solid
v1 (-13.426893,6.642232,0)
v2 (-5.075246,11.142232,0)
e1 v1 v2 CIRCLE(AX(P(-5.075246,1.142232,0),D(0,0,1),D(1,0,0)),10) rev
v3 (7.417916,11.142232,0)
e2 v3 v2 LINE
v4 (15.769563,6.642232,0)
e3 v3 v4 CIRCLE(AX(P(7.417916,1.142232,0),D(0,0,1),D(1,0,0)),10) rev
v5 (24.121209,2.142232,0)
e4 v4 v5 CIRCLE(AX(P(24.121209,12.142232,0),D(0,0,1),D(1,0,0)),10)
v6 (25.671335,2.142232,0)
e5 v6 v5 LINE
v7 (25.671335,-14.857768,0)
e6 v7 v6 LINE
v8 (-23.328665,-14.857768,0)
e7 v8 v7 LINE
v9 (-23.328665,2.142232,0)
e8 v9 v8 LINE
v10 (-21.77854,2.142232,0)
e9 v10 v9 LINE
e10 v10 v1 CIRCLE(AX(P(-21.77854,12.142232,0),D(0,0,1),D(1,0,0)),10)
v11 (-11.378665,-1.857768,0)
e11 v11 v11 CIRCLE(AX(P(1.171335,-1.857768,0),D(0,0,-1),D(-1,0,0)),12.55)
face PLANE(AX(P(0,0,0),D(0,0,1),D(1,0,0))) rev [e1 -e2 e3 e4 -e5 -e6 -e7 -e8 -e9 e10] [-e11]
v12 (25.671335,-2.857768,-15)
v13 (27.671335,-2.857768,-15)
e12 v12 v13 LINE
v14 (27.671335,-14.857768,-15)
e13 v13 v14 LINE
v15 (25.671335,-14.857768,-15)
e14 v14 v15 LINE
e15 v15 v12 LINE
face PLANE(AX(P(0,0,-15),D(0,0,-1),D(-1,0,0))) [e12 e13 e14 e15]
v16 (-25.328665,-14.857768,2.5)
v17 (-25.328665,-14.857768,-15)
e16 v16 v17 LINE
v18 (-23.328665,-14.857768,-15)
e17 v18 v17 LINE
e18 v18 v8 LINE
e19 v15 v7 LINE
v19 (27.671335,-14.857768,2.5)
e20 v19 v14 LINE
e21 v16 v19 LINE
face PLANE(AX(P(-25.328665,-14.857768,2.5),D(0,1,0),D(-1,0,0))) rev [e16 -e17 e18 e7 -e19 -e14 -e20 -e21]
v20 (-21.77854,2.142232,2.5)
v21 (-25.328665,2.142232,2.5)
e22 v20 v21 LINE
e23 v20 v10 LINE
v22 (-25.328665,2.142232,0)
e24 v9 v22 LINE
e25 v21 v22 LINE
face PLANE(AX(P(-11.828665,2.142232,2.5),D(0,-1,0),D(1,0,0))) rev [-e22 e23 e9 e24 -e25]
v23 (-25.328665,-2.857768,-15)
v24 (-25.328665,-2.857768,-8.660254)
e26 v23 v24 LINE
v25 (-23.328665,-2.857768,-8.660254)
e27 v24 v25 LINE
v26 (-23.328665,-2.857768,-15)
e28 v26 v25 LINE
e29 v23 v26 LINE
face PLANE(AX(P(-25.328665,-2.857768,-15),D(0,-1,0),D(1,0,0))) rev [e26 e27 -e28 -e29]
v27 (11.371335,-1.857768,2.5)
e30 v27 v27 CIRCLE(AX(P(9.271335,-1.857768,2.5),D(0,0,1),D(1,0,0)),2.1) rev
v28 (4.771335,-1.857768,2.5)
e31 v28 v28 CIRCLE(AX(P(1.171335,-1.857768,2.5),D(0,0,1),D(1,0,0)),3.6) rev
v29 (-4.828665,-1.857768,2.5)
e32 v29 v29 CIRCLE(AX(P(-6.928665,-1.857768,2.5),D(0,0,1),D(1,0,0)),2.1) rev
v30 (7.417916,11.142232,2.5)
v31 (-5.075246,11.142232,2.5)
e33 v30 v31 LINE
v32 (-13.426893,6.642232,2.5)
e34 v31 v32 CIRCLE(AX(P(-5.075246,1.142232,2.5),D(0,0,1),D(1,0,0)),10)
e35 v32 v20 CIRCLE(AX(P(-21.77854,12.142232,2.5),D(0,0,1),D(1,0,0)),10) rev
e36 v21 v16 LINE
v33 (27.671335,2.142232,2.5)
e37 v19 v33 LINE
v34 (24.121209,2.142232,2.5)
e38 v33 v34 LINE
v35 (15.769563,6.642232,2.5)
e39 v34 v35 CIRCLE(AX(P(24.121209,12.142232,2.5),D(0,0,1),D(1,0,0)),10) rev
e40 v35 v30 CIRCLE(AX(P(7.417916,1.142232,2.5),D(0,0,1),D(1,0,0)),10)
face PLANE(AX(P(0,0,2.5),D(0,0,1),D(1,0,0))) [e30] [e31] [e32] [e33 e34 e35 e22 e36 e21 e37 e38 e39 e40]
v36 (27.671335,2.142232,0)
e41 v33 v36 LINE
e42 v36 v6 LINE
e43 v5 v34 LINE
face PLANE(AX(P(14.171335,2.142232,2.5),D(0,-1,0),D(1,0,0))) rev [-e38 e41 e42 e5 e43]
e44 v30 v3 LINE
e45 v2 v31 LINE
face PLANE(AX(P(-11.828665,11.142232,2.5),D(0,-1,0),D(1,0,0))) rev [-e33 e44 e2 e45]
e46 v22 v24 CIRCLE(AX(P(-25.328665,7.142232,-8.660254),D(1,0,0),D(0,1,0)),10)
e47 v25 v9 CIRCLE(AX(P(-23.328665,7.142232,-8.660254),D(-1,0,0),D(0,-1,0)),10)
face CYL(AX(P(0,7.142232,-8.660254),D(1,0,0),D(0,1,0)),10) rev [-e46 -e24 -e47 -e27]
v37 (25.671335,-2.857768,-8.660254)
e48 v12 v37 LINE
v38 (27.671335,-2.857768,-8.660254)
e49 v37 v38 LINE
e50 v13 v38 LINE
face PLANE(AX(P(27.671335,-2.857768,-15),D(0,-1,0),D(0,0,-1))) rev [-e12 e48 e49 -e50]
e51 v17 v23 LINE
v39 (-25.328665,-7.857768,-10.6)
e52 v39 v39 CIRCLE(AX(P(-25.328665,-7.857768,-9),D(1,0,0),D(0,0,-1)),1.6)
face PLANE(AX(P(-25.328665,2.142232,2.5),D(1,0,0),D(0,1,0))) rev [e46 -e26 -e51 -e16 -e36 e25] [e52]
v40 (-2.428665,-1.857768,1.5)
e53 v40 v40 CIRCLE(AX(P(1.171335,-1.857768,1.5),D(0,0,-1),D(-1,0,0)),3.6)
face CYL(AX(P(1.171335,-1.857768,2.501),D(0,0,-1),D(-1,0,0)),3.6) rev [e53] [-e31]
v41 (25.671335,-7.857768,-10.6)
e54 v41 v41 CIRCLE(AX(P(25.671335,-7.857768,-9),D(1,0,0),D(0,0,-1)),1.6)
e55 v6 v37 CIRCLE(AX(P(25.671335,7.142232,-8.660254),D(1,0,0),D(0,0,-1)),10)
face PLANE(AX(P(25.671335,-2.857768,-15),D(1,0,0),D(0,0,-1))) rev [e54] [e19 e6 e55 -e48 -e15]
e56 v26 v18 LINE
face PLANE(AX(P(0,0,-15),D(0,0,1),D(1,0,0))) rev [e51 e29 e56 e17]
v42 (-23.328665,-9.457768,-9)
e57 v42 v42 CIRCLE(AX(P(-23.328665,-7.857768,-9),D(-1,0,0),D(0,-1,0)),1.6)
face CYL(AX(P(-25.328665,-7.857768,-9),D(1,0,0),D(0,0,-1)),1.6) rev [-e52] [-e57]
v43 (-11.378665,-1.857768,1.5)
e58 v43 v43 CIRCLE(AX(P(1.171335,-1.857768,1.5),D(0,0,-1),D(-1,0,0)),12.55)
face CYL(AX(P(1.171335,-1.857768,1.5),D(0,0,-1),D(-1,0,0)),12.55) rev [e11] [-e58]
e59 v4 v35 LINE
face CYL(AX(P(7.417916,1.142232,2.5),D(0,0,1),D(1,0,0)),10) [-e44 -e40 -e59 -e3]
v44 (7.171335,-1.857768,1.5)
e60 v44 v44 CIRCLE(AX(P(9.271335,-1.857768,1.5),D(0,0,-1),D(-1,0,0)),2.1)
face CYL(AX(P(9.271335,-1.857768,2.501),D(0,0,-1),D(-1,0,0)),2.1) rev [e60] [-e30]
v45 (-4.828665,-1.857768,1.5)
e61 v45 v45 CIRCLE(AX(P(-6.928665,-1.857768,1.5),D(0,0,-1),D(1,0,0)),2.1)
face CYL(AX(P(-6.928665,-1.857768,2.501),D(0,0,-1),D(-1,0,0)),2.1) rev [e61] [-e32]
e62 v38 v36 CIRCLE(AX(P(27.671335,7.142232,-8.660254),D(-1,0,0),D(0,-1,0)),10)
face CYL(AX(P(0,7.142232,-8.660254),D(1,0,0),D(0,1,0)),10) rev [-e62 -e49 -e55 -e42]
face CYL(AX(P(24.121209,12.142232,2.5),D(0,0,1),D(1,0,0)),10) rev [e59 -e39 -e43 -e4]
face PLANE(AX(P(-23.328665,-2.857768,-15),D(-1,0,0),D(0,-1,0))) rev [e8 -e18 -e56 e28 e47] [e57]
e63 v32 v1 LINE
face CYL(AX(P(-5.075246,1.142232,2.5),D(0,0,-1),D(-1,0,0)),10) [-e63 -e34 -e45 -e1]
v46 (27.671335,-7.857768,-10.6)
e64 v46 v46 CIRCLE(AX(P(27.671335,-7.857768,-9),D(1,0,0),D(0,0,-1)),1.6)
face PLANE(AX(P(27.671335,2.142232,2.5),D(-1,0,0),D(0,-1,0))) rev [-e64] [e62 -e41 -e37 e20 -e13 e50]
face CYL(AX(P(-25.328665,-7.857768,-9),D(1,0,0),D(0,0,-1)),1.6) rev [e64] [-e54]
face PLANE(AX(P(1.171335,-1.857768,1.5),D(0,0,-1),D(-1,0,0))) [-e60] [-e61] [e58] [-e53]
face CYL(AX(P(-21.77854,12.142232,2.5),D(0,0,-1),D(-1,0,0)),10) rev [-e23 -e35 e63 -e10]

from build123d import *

# Parameters (mm, degrees)
BOSS_EXTRUDE1_DEPTH = 2.5
SKETCH4_R           = 12.55
CUT_EXTRUDE1_DEPTH  = 1.5
CUT_EXTRUDE2_REACH  = 33.444
SKETCH5_R           = 2.1
SKETCH5_R_2         = 3.6
SKETCH8_W           = 2
SKETCH8_H           = 12
BOSS_EXTRUDE3_DEPTH = 15
FILLET3_R           = 10
FILLET4_R           = 10
SKETCH9_R           = 1.6
CUT_EXTRUDE3_DEPTH  = 58.050444972


with BuildPart() as part:
    # Sketch3 → Boss-Extrude1 (new body)
    with BuildSketch(Plane.XY):
        Polygon((-11.828665208, 11.142231947), (14.171334792, 11.142231947), (14.171334792, 2.142231947), (27.671334792, 2.142231947), (27.671334792, -14.857768053), (-25.328665208, -14.857768053), (-25.328665208, 2.142231947), (-11.828665208, 2.142231947), align=None)
    extrude(amount=BOSS_EXTRUDE1_DEPTH)

    # Sketch4 → Cut-Extrude1 (cut)
    with BuildSketch(Plane(origin=(0, 0, 0), x_dir=(-1, 0, 0), z_dir=(0, 0, -1))):
        with Locations((-1.171334792, -1.857768053)):
            Circle(SKETCH4_R)
    extrude(amount=-CUT_EXTRUDE1_DEPTH, mode=Mode.SUBTRACT)

    # Sketch5 → Cut-Extrude2 (cut, up to next)
    with BuildSketch(Plane(origin=(0, 0, 1.5), x_dir=(-1, 0, 0), z_dir=(0, 0, -1)), mode=Mode.PRIVATE) as cut_extrude2_sk1:
        with Locations((-9.271334792, -1.857768053)):
            Circle(SKETCH5_R)
    cut_extrude2_tool1 = extrude(cut_extrude2_sk1.sketch, amount=-CUT_EXTRUDE2_REACH, mode=Mode.PRIVATE) & part.part
    # Sketch5 → Cut-Extrude2 (cut, up to next)
    with BuildSketch(Plane(origin=(0, 0, 1.5), x_dir=(-1, 0, 0), z_dir=(0, 0, -1)), mode=Mode.PRIVATE) as cut_extrude2_sk2:
        with Locations(Location((6.928665208, -1.857768053, 0), (0, 0, 180))):
            Circle(SKETCH5_R)
    cut_extrude2_tool2 = extrude(cut_extrude2_sk2.sketch, amount=-CUT_EXTRUDE2_REACH, mode=Mode.PRIVATE) & part.part
    # Sketch5 → Cut-Extrude2 (cut, up to next)
    with BuildSketch(Plane(origin=(0, 0, 1.5), x_dir=(-1, 0, 0), z_dir=(0, 0, -1)), mode=Mode.PRIVATE) as cut_extrude2_sk3:
        with Locations((-1.171334792, -1.857768053)):
            Circle(SKETCH5_R_2)
    cut_extrude2_tool3 = extrude(cut_extrude2_sk3.sketch, amount=-CUT_EXTRUDE2_REACH, mode=Mode.PRIVATE) & part.part
    add(cut_extrude2_tool1.solids().sort_by_distance((9.271335, -1.857768, 1.5))[0], mode=Mode.SUBTRACT)
    add(cut_extrude2_tool2.solids().sort_by_distance((-6.928665, -1.857768, 1.5))[0], mode=Mode.SUBTRACT)
    add(cut_extrude2_tool3.solids().sort_by_distance((1.171335, -1.857768, 1.5))[0], mode=Mode.SUBTRACT)

    # Sketch8 → Boss-Extrude3 (add)
    with BuildSketch(Plane(origin=(0, 0, 0), x_dir=(-1, 0, 0), z_dir=(0, 0, -1))):
        with Locations((-26.671334792, -8.857768053)):
            Rectangle(SKETCH8_W, SKETCH8_H)
        with Locations((24.328665208, -8.857768053)):
            Rectangle(SKETCH8_W, SKETCH8_H)
    extrude(amount=BOSS_EXTRUDE3_DEPTH)

    # Fillet3
    # the kernel refuses this fillet: 10 mm, written as the material it adds along each edge
    with BuildSketch(Plane(origin=(-11.828665208, 2.142231947, 0), x_dir=(-1, 0, 0), z_dir=(0, 0, 1))) as fillet3_piece_1:
        with BuildLine():
            CenterArc((9.949874371, -10), FILLET3_R, 90, 84.260829523)
            Line((0, -9), (-0.198997487, -8.98))
            ThreePointArc((-0.198997487, -8.98), (-0.2, -4.5), (-0.2, 0))
            Line((-0.2, 0), (0, 0.2))
            Line((0, 0.2), (9.949874371, 0.2))
            Line((9.949874371, 0.2), (9.949874371, 0))
        make_face()
    extrude(amount=2.5)
    with BuildSketch(Plane(origin=(14.171334792, 2.142231947, 0), x_dir=(1, 0, 0), z_dir=(0, 0, 1))) as fillet3_piece_2:
        with BuildLine():
            CenterArc((9.949874371, 10), FILLET3_R, 185.739170477, 84.260829523)
            Line((0, 9), (-0.198997487, 8.98))
            ThreePointArc((-0.198997487, 8.98), (-0.2, 4.5), (-0.2, 0))
            Line((-0.2, 0), (0, -0.2))
            Line((0, -0.2), (9.949874371, -0.2))
            Line((9.949874371, -0.2), (9.949874371, 0))
        make_face()
    extrude(amount=2.5)
    with BuildSketch(Plane(origin=(-23.328665208, -2.857768053, 0), x_dir=(0, 0, -1), z_dir=(-1, 0, 0)), Plane(origin=(27.671334792, -2.857768053, 0), x_dir=(0, 0, -1), z_dir=(-1, 0, 0))) as fillet3_piece_3:
        with BuildLine():
            CenterArc((8.660254038, -10), FILLET3_R, 90, 60)
            Line((0, -5), (-0.173205081, -4.9))
            ThreePointArc((-0.173205081, -4.9), (-0.2, -2.5), (-0.2, 0))
            Line((-0.2, 0), (0, 0.2))
            Line((0, 0.2), (8.660254038, 0.2))
            Line((8.660254038, 0.2), (8.660254038, 0))
        make_face()
    extrude(amount=2)

    # Fillet4
    fillet4_edges = [part.edges().sort_by_distance(p)[0] for p in [
        (-11.828665208, 11.142231947, 1.25),
        (14.171334792, 11.142231947, 1.25),
    ]]
    fillet(fillet4_edges, radius=FILLET4_R)

    # Sketch9 → Cut-Extrude3 (cut, through all)
    with BuildSketch(Plane(origin=(27.671334792, 0, 0), x_dir=(0, 0, -1), z_dir=(1, 0, 0))):
        with Locations((9, -7.857768053)):
            Circle(SKETCH9_R)
    extrude(amount=-CUT_EXTRUDE3_DEPTH, mode=Mode.SUBTRACT)


solid = part.part
